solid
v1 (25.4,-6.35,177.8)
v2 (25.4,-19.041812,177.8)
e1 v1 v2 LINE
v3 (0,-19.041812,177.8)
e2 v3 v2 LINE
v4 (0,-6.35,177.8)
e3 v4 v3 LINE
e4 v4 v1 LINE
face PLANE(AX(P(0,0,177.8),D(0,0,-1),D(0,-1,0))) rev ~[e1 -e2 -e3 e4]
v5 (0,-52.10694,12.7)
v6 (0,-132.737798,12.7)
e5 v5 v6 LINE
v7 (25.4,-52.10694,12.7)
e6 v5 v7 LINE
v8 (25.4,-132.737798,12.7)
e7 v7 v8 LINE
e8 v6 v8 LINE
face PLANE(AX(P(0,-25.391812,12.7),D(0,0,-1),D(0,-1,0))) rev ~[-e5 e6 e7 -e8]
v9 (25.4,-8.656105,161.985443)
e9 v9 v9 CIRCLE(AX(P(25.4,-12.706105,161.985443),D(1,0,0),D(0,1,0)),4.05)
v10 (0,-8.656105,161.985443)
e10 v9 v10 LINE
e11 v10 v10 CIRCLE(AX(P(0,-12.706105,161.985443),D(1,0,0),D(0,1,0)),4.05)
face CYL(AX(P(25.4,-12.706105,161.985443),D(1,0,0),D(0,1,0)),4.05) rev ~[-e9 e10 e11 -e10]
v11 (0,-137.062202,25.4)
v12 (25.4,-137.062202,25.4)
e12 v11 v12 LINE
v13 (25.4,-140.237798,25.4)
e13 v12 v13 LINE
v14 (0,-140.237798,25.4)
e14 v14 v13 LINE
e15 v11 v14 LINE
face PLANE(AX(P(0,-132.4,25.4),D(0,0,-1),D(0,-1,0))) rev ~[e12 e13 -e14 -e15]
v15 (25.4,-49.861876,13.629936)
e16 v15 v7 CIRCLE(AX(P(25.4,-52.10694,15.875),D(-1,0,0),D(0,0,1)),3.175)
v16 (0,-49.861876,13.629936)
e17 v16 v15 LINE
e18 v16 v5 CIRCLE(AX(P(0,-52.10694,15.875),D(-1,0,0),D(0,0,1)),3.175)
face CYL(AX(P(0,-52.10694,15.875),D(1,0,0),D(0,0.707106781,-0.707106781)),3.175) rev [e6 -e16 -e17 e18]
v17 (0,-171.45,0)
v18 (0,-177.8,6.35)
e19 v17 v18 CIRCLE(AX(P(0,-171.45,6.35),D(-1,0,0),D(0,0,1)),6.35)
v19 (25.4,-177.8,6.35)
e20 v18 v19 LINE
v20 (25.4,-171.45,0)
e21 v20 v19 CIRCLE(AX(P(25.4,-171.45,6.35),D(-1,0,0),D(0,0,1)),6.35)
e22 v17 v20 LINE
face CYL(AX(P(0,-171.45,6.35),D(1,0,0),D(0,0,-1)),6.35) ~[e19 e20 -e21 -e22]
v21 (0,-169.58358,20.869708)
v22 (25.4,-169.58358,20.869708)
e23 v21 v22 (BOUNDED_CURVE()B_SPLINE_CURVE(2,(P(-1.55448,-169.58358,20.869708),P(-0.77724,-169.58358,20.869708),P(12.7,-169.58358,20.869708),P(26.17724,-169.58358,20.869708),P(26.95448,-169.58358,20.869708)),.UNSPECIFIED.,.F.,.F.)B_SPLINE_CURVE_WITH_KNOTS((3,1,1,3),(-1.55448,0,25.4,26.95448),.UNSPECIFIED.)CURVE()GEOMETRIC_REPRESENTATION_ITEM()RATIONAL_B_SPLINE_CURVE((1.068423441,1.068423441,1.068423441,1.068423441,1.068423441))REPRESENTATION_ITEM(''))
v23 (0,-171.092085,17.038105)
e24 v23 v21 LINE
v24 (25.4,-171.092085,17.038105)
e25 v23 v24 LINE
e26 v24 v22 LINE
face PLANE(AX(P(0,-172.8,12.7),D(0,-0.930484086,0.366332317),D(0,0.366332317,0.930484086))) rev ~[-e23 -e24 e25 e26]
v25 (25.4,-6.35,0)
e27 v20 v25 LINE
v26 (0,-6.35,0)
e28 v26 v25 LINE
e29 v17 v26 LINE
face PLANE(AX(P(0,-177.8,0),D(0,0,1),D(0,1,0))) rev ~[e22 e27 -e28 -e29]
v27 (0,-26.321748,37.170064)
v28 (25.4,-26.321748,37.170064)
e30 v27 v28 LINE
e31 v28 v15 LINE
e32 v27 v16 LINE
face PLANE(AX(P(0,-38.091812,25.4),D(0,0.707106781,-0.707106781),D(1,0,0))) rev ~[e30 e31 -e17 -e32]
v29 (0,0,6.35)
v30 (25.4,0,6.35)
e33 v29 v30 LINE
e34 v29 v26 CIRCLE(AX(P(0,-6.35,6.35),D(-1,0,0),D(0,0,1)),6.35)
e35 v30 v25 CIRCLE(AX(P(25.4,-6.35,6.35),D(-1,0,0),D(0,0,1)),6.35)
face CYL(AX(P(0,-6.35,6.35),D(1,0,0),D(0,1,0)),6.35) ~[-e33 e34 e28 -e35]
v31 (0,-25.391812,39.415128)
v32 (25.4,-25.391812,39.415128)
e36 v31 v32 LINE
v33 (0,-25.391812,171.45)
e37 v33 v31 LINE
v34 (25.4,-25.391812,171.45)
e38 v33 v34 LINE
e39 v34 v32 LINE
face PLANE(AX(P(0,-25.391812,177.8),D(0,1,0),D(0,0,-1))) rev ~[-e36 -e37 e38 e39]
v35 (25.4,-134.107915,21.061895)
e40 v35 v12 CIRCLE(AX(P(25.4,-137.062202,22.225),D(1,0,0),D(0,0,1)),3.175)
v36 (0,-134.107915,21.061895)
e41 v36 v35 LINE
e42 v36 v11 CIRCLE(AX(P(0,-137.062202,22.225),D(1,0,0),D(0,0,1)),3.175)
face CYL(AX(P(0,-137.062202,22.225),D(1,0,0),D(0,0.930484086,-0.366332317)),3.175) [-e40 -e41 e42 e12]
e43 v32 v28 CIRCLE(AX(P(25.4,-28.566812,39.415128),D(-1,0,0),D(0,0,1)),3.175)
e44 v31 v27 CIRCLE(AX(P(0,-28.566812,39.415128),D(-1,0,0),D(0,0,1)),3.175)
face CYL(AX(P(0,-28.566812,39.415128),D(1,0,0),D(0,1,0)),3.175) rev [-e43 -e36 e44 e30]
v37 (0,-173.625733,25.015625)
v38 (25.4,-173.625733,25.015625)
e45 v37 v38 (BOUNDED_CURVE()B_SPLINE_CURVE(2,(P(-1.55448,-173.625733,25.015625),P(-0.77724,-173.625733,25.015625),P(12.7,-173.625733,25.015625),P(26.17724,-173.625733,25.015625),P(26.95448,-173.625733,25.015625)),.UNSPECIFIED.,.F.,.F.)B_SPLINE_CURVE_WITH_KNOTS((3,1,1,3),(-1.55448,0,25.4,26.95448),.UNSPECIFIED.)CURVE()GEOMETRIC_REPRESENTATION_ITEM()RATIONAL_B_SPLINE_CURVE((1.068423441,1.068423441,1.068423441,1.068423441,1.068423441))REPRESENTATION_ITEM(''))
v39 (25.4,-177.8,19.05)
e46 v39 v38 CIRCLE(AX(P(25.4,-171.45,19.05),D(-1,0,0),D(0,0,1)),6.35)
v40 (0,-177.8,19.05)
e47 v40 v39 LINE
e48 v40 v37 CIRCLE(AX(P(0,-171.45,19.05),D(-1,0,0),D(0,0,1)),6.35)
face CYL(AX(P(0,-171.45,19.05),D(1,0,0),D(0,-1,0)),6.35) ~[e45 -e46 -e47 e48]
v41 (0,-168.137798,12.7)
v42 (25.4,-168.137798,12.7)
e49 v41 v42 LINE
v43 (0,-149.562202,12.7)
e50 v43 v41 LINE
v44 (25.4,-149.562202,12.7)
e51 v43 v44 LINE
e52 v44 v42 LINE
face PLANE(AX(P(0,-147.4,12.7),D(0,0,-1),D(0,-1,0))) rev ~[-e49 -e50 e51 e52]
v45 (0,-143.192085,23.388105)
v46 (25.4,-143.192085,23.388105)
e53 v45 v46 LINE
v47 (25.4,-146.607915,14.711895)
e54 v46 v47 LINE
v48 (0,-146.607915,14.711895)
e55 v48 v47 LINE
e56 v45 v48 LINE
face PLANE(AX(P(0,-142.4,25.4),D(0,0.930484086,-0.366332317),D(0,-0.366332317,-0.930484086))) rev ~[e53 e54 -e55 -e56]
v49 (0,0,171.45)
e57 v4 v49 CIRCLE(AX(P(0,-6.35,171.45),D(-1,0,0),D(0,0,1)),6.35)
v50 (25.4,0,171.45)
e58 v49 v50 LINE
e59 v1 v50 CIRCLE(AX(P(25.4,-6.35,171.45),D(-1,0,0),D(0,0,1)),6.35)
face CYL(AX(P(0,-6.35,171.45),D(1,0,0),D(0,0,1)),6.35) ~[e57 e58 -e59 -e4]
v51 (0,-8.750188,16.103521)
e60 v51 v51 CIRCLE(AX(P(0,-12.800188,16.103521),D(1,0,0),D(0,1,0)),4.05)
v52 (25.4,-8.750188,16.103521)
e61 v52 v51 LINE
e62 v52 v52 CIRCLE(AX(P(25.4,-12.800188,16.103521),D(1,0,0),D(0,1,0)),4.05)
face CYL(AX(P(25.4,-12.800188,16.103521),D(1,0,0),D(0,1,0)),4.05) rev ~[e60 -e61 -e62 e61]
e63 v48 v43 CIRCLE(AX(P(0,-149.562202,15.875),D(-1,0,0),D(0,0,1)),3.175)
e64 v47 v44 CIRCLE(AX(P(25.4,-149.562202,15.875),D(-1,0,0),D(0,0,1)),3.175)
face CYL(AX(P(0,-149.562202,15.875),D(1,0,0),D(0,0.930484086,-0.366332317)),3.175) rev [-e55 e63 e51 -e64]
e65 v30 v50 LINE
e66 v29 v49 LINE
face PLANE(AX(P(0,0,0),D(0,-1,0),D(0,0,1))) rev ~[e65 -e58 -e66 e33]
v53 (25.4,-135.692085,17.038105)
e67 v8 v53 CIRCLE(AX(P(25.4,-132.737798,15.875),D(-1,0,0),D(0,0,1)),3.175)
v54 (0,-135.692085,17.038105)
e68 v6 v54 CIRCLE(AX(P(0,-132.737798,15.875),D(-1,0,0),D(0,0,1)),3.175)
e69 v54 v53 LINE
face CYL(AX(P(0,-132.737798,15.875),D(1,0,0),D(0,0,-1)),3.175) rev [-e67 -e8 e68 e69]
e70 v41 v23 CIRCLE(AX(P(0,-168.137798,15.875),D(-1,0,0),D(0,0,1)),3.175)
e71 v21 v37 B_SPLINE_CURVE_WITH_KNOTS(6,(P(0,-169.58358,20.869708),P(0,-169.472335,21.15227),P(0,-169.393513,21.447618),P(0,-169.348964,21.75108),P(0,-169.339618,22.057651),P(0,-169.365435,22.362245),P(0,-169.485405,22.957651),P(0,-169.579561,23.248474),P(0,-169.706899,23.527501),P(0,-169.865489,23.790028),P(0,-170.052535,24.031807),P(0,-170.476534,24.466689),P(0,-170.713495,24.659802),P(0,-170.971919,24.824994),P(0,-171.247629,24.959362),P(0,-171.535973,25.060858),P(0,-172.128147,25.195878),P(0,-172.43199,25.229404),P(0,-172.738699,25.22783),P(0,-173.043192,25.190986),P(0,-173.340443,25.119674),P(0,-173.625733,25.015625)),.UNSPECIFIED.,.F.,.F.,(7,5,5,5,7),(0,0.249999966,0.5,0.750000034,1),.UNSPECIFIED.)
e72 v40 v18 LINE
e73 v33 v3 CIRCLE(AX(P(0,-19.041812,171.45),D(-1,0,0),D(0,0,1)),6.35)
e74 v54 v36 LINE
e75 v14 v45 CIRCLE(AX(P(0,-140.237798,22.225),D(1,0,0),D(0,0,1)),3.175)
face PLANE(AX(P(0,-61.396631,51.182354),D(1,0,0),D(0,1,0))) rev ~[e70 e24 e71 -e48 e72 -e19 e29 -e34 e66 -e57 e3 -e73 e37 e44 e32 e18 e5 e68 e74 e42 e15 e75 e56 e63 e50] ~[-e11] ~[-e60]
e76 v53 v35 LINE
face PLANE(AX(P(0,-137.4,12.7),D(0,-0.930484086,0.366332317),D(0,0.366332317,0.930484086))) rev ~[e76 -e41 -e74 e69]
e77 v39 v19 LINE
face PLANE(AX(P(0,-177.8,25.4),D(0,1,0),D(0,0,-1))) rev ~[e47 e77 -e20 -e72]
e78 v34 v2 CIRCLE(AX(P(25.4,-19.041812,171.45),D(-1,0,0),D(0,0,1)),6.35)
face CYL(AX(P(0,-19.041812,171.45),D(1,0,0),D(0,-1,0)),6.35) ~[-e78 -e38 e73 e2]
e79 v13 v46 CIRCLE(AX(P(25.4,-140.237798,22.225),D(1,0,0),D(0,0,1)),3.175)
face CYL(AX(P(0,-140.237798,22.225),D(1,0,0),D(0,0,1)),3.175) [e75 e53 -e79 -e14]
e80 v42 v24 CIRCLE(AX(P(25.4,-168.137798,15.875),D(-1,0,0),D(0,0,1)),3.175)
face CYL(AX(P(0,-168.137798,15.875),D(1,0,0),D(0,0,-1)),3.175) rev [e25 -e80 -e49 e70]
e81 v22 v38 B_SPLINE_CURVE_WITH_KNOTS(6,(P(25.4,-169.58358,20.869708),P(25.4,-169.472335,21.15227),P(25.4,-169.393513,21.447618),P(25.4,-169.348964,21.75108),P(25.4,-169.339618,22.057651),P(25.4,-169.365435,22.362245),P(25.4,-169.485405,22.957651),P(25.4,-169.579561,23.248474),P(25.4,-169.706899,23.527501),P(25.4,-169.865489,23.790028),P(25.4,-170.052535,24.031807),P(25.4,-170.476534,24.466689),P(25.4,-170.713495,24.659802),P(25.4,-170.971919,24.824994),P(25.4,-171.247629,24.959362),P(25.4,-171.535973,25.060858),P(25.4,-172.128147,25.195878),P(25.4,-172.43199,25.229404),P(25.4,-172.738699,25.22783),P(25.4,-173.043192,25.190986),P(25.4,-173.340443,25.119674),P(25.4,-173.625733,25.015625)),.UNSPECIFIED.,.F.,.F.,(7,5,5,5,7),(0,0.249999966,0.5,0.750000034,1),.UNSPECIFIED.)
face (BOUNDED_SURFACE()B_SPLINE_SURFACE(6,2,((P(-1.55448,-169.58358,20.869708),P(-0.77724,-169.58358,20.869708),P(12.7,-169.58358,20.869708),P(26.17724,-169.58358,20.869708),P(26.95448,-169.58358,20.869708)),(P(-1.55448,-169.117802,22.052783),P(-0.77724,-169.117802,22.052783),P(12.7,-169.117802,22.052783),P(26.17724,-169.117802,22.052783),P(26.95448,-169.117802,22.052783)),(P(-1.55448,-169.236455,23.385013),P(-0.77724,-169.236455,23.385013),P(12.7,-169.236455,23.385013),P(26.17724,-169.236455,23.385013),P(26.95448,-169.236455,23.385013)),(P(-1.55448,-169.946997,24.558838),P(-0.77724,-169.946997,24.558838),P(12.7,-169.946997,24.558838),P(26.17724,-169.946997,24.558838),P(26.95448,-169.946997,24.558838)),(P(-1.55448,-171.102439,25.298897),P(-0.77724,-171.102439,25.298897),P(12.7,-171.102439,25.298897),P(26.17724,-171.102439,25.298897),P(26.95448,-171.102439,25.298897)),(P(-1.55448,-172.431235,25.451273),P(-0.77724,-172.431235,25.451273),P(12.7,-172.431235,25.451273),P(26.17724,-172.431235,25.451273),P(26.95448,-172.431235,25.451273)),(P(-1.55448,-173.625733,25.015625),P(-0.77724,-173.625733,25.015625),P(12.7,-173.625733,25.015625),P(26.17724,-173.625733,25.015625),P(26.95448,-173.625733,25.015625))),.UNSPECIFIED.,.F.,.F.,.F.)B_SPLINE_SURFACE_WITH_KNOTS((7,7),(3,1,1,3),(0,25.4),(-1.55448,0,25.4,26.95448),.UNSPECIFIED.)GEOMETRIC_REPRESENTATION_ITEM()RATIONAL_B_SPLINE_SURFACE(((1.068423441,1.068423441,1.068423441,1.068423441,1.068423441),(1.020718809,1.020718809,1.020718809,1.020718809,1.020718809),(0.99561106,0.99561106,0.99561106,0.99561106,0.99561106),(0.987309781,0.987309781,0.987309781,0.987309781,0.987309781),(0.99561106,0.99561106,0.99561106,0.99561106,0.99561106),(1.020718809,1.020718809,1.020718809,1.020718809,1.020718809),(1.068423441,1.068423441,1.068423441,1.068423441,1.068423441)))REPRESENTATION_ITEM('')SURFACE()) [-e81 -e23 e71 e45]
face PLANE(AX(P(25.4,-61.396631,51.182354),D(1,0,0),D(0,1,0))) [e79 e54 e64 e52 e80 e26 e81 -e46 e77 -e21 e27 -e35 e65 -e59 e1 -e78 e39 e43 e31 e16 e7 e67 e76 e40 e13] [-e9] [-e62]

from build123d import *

# Parameters (mm, degrees)
F1_DEPTH = 25.4
F2_SIZE  = 25.4
F3_R     = 6.35
F4_R     = 3.175
F5_R     = 4.05
F6_DEPTH = 25.4010001


with BuildPart() as f1:
    # F0 (on Right) → F1 (new body)
    with BuildSketch(Plane.YZ):
        Polygon((-177.8, 0), (0, 0), (0, 177.8), (-25.3918121044, 177.8), (-25.3918121044, 12.7), (-137.4, 12.7), (-132.4, 25.4), (-142.4, 25.4), (-147.4, 12.7), (-172.8, 12.7), (-167.8, 25.4), (-177.8, 25.4), align=None)
    extrude(amount=F1_DEPTH)

    # F2
    f2_edges = [f1.edges().sort_by_distance(p)[0] for p in [
        (12.7, -25.391812, 12.7),
    ]]
    chamfer(f2_edges, length=F2_SIZE)

    # F3
    f3_edges = [f1.edges().sort_by_distance(p)[0] for p in [
        (12.7, 0, 0),
        (12.7, 0, 177.8),
        (12.7, -25.391812, 177.8),
        (12.7, -177.8, 25.4),
        (12.7, -177.8, 0),
    ]]
    fillet(f3_edges, radius=F3_R)

    # F4
    f4_edges = [f1.edges().sort_by_distance(p)[0] for p in [
        (12.7, -172.8, 12.7),
        (12.7, -137.4, 12.7),
        (12.7, -147.4, 12.7),
        (12.7, -142.4, 25.4),
        (12.7, -132.4, 25.4),
        (12.7, -167.8, 25.4),
        (12.7, -25.391812, 38.1),
        (12.7, -50.791812, 12.7),
    ]]
    fillet(f4_edges, radius=F4_R)

    # F5 (on face) → F6 (cut, through all)
    with BuildSketch(Plane.YZ.offset(25.4)):
        with Locations((-12.7061052421, 161.9854427668)):
            Circle(F5_R)
        with Locations((-12.8001880162, 16.1035214467)):
            Circle(F5_R)
    extrude(amount=-F6_DEPTH, mode=Mode.SUBTRACT)


solid = f1.part
